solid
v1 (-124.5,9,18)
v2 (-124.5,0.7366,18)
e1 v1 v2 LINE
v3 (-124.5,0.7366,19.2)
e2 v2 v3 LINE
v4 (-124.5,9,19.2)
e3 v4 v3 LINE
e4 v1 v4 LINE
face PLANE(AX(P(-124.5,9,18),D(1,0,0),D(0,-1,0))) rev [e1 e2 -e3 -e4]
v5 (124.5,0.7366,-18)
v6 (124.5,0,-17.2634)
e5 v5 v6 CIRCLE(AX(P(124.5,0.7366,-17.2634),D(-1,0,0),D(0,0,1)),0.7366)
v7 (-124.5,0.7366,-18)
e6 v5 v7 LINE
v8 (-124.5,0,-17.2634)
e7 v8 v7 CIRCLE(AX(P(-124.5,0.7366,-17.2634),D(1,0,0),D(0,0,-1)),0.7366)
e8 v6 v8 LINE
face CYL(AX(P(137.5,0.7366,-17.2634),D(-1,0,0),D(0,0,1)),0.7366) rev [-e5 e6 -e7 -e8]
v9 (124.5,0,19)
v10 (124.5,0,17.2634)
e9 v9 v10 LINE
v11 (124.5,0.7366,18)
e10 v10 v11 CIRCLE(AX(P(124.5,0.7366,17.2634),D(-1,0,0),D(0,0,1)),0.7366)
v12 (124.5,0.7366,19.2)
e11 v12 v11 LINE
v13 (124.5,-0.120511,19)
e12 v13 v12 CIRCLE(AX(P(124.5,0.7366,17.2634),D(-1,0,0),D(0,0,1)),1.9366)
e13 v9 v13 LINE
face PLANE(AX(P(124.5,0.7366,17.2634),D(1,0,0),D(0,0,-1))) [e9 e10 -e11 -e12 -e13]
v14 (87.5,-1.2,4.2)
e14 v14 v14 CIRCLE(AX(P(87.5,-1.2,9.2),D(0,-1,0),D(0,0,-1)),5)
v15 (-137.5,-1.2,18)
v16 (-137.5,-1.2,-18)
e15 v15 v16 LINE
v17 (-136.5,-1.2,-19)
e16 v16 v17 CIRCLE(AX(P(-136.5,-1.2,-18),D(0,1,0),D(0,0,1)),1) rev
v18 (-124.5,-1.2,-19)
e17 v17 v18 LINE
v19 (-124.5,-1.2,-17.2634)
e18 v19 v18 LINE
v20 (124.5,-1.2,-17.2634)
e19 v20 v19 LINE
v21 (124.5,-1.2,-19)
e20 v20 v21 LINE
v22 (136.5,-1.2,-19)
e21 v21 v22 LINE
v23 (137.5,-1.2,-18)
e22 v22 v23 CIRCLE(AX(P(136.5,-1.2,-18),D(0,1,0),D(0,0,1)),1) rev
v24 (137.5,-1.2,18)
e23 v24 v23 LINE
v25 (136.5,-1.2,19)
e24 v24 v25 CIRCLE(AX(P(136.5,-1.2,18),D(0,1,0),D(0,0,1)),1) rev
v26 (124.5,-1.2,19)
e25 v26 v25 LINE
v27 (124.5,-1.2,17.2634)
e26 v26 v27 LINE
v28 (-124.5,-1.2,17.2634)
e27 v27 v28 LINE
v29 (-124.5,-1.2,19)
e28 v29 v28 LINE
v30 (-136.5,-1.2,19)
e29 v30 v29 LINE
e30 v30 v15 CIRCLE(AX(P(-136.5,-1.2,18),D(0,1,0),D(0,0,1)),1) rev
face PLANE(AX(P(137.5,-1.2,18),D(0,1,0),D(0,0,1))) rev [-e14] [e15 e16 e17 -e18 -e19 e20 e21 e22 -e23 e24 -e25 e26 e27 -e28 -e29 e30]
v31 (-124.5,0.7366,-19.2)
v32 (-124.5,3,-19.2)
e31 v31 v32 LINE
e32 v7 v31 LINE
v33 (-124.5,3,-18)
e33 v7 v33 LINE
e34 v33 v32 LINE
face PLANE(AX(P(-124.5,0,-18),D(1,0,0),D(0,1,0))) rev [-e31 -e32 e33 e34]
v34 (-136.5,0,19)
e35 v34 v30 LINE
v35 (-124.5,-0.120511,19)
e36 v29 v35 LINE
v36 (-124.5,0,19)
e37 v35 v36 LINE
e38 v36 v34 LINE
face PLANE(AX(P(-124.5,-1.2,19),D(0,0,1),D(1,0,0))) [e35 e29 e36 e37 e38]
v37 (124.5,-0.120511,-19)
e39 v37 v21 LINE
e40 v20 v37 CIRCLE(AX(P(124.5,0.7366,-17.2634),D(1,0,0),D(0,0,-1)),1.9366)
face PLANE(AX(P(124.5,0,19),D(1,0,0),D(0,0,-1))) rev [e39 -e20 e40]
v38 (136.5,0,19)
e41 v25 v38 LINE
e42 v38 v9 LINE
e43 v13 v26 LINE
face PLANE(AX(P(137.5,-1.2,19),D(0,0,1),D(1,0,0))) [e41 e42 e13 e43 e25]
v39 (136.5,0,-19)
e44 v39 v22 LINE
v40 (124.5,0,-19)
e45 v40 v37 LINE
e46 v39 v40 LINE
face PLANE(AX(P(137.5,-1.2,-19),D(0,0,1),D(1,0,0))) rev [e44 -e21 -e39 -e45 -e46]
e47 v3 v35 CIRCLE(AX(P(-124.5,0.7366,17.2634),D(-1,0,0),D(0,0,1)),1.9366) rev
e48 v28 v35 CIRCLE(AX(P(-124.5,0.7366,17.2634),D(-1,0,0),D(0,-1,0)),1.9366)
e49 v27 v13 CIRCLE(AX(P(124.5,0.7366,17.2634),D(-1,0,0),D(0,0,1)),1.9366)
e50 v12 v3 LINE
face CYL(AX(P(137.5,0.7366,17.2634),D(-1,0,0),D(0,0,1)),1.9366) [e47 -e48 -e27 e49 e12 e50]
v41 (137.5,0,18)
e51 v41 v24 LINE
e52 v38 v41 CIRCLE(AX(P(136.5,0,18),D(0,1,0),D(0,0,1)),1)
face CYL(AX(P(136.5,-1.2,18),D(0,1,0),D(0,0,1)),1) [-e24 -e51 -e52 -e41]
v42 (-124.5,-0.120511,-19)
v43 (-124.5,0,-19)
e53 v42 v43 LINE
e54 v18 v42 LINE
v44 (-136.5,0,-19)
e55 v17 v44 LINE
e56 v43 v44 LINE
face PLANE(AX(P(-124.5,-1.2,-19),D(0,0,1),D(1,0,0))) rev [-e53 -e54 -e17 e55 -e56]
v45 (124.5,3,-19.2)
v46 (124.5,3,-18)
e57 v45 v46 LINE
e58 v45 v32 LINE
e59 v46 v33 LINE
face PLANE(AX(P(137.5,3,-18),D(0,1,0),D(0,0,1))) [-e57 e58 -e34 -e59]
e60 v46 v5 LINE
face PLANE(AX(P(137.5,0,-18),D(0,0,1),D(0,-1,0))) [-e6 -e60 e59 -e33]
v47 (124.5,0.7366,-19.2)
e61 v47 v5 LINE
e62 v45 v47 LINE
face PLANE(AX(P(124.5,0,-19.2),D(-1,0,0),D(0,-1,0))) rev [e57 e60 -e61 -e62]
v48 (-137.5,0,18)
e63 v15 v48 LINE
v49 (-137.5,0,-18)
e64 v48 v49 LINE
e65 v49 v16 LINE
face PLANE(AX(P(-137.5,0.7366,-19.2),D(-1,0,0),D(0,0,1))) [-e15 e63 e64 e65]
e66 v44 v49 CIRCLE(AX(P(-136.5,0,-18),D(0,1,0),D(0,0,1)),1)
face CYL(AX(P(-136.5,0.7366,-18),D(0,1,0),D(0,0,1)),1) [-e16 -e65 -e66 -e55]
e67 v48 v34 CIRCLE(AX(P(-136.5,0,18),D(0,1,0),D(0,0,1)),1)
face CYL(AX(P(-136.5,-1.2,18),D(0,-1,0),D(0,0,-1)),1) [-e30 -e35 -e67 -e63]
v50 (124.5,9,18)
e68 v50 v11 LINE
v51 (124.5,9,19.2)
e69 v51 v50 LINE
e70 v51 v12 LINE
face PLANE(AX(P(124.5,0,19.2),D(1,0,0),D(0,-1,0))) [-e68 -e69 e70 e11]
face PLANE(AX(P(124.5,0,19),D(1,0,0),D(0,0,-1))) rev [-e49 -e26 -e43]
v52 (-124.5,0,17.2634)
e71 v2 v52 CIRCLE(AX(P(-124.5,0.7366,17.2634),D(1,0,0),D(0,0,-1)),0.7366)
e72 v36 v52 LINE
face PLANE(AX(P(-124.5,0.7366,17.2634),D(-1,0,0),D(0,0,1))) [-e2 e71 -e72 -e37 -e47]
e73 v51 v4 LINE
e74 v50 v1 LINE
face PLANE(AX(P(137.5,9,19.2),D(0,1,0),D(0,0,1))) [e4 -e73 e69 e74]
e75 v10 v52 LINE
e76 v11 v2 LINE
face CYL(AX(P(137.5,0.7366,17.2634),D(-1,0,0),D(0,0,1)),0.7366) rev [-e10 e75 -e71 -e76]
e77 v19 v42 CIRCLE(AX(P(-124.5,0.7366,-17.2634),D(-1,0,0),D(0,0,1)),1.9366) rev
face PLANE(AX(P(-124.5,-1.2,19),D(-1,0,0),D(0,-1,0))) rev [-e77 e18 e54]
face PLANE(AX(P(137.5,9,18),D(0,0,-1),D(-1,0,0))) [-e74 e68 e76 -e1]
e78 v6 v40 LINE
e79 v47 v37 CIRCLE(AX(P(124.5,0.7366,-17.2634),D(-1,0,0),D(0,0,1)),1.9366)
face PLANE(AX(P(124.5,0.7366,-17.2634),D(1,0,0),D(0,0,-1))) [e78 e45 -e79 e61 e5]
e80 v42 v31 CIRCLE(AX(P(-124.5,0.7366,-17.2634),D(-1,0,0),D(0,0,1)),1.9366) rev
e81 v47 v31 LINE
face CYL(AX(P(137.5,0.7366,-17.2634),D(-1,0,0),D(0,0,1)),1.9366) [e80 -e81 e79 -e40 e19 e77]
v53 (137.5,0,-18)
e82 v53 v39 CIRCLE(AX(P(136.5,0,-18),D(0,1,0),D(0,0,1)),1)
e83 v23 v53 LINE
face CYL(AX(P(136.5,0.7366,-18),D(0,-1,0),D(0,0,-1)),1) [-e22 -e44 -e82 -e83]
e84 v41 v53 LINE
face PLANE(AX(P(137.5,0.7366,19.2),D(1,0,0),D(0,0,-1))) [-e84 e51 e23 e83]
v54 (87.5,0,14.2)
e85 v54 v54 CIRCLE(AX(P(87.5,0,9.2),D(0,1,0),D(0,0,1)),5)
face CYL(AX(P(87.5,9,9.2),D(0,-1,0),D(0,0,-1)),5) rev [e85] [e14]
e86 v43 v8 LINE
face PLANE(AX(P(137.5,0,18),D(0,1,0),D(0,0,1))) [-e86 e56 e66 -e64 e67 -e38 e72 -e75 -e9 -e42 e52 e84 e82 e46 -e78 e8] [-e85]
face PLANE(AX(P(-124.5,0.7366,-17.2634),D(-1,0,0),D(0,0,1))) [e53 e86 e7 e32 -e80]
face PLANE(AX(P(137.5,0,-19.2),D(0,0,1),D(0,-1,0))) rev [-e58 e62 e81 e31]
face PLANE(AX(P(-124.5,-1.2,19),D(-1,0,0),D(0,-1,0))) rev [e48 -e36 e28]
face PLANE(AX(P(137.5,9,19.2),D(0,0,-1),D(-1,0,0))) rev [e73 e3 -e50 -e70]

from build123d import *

# Parameters (mm, degrees)
FLANGE_BASE2_DEPTH       = 137.5
CORTE_EXTRUS_O3_START    = -137.5
CORTE_EXTRUS_O3_DEPTH    = 13
CORTE_EXTRUS_O3_START_2  = 124.5
CORTE_EXTRUS_O3_2_DEPTH  = 13
ESBO_O12_W               = 13
ESBO_O12_H               = 1.2
RESSALTO_EXTRUS_O1_DEPTH = 19
FILETE1_R                = 1
ESBO_O13_R               = 5
CORTE_EXTRUS_O4_DEPTH    = 140.208225332


# Read off the part's stored shape, not the designer's step: Corte-extrusão3
# Sheet-metal steps are written as plain solids
with BuildPart() as part:
    # Esboço1 → Flange-base2 (new, symmetric)
    with BuildSketch(Plane(origin=(0, 0, 0), x_dir=(0, 0, -1), z_dir=(1, 0, 0))):
        with BuildLine():
            Line((-18, 9), (-18, 0.7366))
            ThreePointArc((-18, 0.7366), (-17.784254855, 0.215745145), (-17.2634, 0))
            Line((-17.2634, 0), (17.2634, 0))
            ThreePointArc((17.2634, 0), (17.784254855, 0.215745145), (18, 0.7366))
            Line((18, 0.7366), (18, 3))
            Line((18, 3), (19.2, 3))
            Line((19.2, 3), (19.2, 0.7366))
            ThreePointArc((19.2, 0.7366), (18.632782992, -0.632782992), (17.2634, -1.2))
            Line((17.2634, -1.2), (-17.2634, -1.2))
            ThreePointArc((-17.2634, -1.2), (-18.632782992, -0.632782992), (-19.2, 0.7366))
            Line((-19.2, 0.7366), (-19.2, 9))
            Line((-19.2, 9), (-18, 9))
        make_face()
    extrude(amount=FLANGE_BASE2_DEPTH, both=True)

    # Corte-extrusão3 outline → Corte-extrusão3 (cut)
    with BuildSketch(Plane.YZ.offset(CORTE_EXTRUS_O3_START)):
        with BuildLine():
            Line((-1.2, 17.2634), (0, 17.2634))
            ThreePointArc((0, 17.2634), (0.215745145, 17.784254855), (0.7366, 18))
            Line((0.7366, 18), (9, 18))
            Line((9, 18), (9, 19.2))
            Line((9, 19.2), (0.7366, 19.2))
            ThreePointArc((0.7366, 19.2), (-0.632782992, 18.632782992), (-1.2, 17.2634))
        make_face()
        with BuildLine():
            ThreePointArc((0.7366, -18), (0.215745145, -17.784254855), (0, -17.2634))
            Line((0, -17.2634), (-1.2, -17.2634))
            ThreePointArc((-1.2, -17.2634), (-0.632782992, -18.632782992), (0.7366, -19.2))
            Line((0.7366, -19.2), (3, -19.2))
            Line((3, -19.2), (3, -18))
            Line((3, -18), (0.7366, -18))
        make_face()
    extrude(amount=CORTE_EXTRUS_O3_DEPTH, mode=Mode.SUBTRACT)

    # Corte-extrus_o3 2 outline → Corte-extrus_o3 2 (cut)
    with BuildSketch(Plane.YZ.offset(CORTE_EXTRUS_O3_START_2)):
        with BuildLine():
            Line((-1.2, 17.2634), (0, 17.2634))
            ThreePointArc((0, 17.2634), (0.215745145, 17.784254855), (0.7366, 18))
            Line((0.7366, 18), (9, 18))
            Line((9, 18), (9, 19.2))
            Line((9, 19.2), (0.7366, 19.2))
            ThreePointArc((0.7366, 19.2), (-0.632782992, 18.632782992), (-1.2, 17.2634))
        make_face()
        with BuildLine():
            ThreePointArc((0.7366, -18), (0.215745145, -17.784254855), (0, -17.2634))
            Line((0, -17.2634), (-1.2, -17.2634))
            ThreePointArc((-1.2, -17.2634), (-0.632782992, -18.632782992), (0.7366, -19.2))
            Line((0.7366, -19.2), (3, -19.2))
            Line((3, -19.2), (3, -18))
            Line((3, -18), (0.7366, -18))
        make_face()
    extrude(amount=CORTE_EXTRUS_O3_2_DEPTH, mode=Mode.SUBTRACT)

    # Esboço12 → Ressalto-extrusão1 (add, symmetric)
    with BuildSketch(Plane.XY):
        with Locations((131, -0.6)):
            Rectangle(ESBO_O12_W, ESBO_O12_H)
        with Locations((-131, -0.6)):
            Rectangle(ESBO_O12_W, ESBO_O12_H)
    extrude(amount=RESSALTO_EXTRUS_O1_DEPTH, both=True)

    # Filete1
    filete1_edges = [part.edges().sort_by_distance(p)[0] for p in [
        (137.5, -0.6, -19),
        (137.5, -0.6, 19),
        (-137.5, -0.6, -19),
        (-137.5, -0.6, 19),
    ]]
    fillet(filete1_edges, radius=FILETE1_R)

    # Esboço13 → Corte-extrusão4 (cut, through all)
    with BuildSketch(Plane.XZ.offset(1.2)):
        with Locations(Location((87.5, 9.2, 0), (0, 0, 270))):
            Circle(ESBO_O13_R)
    extrude(amount=-CORTE_EXTRUS_O4_DEPTH, mode=Mode.SUBTRACT)


solid = part.part
